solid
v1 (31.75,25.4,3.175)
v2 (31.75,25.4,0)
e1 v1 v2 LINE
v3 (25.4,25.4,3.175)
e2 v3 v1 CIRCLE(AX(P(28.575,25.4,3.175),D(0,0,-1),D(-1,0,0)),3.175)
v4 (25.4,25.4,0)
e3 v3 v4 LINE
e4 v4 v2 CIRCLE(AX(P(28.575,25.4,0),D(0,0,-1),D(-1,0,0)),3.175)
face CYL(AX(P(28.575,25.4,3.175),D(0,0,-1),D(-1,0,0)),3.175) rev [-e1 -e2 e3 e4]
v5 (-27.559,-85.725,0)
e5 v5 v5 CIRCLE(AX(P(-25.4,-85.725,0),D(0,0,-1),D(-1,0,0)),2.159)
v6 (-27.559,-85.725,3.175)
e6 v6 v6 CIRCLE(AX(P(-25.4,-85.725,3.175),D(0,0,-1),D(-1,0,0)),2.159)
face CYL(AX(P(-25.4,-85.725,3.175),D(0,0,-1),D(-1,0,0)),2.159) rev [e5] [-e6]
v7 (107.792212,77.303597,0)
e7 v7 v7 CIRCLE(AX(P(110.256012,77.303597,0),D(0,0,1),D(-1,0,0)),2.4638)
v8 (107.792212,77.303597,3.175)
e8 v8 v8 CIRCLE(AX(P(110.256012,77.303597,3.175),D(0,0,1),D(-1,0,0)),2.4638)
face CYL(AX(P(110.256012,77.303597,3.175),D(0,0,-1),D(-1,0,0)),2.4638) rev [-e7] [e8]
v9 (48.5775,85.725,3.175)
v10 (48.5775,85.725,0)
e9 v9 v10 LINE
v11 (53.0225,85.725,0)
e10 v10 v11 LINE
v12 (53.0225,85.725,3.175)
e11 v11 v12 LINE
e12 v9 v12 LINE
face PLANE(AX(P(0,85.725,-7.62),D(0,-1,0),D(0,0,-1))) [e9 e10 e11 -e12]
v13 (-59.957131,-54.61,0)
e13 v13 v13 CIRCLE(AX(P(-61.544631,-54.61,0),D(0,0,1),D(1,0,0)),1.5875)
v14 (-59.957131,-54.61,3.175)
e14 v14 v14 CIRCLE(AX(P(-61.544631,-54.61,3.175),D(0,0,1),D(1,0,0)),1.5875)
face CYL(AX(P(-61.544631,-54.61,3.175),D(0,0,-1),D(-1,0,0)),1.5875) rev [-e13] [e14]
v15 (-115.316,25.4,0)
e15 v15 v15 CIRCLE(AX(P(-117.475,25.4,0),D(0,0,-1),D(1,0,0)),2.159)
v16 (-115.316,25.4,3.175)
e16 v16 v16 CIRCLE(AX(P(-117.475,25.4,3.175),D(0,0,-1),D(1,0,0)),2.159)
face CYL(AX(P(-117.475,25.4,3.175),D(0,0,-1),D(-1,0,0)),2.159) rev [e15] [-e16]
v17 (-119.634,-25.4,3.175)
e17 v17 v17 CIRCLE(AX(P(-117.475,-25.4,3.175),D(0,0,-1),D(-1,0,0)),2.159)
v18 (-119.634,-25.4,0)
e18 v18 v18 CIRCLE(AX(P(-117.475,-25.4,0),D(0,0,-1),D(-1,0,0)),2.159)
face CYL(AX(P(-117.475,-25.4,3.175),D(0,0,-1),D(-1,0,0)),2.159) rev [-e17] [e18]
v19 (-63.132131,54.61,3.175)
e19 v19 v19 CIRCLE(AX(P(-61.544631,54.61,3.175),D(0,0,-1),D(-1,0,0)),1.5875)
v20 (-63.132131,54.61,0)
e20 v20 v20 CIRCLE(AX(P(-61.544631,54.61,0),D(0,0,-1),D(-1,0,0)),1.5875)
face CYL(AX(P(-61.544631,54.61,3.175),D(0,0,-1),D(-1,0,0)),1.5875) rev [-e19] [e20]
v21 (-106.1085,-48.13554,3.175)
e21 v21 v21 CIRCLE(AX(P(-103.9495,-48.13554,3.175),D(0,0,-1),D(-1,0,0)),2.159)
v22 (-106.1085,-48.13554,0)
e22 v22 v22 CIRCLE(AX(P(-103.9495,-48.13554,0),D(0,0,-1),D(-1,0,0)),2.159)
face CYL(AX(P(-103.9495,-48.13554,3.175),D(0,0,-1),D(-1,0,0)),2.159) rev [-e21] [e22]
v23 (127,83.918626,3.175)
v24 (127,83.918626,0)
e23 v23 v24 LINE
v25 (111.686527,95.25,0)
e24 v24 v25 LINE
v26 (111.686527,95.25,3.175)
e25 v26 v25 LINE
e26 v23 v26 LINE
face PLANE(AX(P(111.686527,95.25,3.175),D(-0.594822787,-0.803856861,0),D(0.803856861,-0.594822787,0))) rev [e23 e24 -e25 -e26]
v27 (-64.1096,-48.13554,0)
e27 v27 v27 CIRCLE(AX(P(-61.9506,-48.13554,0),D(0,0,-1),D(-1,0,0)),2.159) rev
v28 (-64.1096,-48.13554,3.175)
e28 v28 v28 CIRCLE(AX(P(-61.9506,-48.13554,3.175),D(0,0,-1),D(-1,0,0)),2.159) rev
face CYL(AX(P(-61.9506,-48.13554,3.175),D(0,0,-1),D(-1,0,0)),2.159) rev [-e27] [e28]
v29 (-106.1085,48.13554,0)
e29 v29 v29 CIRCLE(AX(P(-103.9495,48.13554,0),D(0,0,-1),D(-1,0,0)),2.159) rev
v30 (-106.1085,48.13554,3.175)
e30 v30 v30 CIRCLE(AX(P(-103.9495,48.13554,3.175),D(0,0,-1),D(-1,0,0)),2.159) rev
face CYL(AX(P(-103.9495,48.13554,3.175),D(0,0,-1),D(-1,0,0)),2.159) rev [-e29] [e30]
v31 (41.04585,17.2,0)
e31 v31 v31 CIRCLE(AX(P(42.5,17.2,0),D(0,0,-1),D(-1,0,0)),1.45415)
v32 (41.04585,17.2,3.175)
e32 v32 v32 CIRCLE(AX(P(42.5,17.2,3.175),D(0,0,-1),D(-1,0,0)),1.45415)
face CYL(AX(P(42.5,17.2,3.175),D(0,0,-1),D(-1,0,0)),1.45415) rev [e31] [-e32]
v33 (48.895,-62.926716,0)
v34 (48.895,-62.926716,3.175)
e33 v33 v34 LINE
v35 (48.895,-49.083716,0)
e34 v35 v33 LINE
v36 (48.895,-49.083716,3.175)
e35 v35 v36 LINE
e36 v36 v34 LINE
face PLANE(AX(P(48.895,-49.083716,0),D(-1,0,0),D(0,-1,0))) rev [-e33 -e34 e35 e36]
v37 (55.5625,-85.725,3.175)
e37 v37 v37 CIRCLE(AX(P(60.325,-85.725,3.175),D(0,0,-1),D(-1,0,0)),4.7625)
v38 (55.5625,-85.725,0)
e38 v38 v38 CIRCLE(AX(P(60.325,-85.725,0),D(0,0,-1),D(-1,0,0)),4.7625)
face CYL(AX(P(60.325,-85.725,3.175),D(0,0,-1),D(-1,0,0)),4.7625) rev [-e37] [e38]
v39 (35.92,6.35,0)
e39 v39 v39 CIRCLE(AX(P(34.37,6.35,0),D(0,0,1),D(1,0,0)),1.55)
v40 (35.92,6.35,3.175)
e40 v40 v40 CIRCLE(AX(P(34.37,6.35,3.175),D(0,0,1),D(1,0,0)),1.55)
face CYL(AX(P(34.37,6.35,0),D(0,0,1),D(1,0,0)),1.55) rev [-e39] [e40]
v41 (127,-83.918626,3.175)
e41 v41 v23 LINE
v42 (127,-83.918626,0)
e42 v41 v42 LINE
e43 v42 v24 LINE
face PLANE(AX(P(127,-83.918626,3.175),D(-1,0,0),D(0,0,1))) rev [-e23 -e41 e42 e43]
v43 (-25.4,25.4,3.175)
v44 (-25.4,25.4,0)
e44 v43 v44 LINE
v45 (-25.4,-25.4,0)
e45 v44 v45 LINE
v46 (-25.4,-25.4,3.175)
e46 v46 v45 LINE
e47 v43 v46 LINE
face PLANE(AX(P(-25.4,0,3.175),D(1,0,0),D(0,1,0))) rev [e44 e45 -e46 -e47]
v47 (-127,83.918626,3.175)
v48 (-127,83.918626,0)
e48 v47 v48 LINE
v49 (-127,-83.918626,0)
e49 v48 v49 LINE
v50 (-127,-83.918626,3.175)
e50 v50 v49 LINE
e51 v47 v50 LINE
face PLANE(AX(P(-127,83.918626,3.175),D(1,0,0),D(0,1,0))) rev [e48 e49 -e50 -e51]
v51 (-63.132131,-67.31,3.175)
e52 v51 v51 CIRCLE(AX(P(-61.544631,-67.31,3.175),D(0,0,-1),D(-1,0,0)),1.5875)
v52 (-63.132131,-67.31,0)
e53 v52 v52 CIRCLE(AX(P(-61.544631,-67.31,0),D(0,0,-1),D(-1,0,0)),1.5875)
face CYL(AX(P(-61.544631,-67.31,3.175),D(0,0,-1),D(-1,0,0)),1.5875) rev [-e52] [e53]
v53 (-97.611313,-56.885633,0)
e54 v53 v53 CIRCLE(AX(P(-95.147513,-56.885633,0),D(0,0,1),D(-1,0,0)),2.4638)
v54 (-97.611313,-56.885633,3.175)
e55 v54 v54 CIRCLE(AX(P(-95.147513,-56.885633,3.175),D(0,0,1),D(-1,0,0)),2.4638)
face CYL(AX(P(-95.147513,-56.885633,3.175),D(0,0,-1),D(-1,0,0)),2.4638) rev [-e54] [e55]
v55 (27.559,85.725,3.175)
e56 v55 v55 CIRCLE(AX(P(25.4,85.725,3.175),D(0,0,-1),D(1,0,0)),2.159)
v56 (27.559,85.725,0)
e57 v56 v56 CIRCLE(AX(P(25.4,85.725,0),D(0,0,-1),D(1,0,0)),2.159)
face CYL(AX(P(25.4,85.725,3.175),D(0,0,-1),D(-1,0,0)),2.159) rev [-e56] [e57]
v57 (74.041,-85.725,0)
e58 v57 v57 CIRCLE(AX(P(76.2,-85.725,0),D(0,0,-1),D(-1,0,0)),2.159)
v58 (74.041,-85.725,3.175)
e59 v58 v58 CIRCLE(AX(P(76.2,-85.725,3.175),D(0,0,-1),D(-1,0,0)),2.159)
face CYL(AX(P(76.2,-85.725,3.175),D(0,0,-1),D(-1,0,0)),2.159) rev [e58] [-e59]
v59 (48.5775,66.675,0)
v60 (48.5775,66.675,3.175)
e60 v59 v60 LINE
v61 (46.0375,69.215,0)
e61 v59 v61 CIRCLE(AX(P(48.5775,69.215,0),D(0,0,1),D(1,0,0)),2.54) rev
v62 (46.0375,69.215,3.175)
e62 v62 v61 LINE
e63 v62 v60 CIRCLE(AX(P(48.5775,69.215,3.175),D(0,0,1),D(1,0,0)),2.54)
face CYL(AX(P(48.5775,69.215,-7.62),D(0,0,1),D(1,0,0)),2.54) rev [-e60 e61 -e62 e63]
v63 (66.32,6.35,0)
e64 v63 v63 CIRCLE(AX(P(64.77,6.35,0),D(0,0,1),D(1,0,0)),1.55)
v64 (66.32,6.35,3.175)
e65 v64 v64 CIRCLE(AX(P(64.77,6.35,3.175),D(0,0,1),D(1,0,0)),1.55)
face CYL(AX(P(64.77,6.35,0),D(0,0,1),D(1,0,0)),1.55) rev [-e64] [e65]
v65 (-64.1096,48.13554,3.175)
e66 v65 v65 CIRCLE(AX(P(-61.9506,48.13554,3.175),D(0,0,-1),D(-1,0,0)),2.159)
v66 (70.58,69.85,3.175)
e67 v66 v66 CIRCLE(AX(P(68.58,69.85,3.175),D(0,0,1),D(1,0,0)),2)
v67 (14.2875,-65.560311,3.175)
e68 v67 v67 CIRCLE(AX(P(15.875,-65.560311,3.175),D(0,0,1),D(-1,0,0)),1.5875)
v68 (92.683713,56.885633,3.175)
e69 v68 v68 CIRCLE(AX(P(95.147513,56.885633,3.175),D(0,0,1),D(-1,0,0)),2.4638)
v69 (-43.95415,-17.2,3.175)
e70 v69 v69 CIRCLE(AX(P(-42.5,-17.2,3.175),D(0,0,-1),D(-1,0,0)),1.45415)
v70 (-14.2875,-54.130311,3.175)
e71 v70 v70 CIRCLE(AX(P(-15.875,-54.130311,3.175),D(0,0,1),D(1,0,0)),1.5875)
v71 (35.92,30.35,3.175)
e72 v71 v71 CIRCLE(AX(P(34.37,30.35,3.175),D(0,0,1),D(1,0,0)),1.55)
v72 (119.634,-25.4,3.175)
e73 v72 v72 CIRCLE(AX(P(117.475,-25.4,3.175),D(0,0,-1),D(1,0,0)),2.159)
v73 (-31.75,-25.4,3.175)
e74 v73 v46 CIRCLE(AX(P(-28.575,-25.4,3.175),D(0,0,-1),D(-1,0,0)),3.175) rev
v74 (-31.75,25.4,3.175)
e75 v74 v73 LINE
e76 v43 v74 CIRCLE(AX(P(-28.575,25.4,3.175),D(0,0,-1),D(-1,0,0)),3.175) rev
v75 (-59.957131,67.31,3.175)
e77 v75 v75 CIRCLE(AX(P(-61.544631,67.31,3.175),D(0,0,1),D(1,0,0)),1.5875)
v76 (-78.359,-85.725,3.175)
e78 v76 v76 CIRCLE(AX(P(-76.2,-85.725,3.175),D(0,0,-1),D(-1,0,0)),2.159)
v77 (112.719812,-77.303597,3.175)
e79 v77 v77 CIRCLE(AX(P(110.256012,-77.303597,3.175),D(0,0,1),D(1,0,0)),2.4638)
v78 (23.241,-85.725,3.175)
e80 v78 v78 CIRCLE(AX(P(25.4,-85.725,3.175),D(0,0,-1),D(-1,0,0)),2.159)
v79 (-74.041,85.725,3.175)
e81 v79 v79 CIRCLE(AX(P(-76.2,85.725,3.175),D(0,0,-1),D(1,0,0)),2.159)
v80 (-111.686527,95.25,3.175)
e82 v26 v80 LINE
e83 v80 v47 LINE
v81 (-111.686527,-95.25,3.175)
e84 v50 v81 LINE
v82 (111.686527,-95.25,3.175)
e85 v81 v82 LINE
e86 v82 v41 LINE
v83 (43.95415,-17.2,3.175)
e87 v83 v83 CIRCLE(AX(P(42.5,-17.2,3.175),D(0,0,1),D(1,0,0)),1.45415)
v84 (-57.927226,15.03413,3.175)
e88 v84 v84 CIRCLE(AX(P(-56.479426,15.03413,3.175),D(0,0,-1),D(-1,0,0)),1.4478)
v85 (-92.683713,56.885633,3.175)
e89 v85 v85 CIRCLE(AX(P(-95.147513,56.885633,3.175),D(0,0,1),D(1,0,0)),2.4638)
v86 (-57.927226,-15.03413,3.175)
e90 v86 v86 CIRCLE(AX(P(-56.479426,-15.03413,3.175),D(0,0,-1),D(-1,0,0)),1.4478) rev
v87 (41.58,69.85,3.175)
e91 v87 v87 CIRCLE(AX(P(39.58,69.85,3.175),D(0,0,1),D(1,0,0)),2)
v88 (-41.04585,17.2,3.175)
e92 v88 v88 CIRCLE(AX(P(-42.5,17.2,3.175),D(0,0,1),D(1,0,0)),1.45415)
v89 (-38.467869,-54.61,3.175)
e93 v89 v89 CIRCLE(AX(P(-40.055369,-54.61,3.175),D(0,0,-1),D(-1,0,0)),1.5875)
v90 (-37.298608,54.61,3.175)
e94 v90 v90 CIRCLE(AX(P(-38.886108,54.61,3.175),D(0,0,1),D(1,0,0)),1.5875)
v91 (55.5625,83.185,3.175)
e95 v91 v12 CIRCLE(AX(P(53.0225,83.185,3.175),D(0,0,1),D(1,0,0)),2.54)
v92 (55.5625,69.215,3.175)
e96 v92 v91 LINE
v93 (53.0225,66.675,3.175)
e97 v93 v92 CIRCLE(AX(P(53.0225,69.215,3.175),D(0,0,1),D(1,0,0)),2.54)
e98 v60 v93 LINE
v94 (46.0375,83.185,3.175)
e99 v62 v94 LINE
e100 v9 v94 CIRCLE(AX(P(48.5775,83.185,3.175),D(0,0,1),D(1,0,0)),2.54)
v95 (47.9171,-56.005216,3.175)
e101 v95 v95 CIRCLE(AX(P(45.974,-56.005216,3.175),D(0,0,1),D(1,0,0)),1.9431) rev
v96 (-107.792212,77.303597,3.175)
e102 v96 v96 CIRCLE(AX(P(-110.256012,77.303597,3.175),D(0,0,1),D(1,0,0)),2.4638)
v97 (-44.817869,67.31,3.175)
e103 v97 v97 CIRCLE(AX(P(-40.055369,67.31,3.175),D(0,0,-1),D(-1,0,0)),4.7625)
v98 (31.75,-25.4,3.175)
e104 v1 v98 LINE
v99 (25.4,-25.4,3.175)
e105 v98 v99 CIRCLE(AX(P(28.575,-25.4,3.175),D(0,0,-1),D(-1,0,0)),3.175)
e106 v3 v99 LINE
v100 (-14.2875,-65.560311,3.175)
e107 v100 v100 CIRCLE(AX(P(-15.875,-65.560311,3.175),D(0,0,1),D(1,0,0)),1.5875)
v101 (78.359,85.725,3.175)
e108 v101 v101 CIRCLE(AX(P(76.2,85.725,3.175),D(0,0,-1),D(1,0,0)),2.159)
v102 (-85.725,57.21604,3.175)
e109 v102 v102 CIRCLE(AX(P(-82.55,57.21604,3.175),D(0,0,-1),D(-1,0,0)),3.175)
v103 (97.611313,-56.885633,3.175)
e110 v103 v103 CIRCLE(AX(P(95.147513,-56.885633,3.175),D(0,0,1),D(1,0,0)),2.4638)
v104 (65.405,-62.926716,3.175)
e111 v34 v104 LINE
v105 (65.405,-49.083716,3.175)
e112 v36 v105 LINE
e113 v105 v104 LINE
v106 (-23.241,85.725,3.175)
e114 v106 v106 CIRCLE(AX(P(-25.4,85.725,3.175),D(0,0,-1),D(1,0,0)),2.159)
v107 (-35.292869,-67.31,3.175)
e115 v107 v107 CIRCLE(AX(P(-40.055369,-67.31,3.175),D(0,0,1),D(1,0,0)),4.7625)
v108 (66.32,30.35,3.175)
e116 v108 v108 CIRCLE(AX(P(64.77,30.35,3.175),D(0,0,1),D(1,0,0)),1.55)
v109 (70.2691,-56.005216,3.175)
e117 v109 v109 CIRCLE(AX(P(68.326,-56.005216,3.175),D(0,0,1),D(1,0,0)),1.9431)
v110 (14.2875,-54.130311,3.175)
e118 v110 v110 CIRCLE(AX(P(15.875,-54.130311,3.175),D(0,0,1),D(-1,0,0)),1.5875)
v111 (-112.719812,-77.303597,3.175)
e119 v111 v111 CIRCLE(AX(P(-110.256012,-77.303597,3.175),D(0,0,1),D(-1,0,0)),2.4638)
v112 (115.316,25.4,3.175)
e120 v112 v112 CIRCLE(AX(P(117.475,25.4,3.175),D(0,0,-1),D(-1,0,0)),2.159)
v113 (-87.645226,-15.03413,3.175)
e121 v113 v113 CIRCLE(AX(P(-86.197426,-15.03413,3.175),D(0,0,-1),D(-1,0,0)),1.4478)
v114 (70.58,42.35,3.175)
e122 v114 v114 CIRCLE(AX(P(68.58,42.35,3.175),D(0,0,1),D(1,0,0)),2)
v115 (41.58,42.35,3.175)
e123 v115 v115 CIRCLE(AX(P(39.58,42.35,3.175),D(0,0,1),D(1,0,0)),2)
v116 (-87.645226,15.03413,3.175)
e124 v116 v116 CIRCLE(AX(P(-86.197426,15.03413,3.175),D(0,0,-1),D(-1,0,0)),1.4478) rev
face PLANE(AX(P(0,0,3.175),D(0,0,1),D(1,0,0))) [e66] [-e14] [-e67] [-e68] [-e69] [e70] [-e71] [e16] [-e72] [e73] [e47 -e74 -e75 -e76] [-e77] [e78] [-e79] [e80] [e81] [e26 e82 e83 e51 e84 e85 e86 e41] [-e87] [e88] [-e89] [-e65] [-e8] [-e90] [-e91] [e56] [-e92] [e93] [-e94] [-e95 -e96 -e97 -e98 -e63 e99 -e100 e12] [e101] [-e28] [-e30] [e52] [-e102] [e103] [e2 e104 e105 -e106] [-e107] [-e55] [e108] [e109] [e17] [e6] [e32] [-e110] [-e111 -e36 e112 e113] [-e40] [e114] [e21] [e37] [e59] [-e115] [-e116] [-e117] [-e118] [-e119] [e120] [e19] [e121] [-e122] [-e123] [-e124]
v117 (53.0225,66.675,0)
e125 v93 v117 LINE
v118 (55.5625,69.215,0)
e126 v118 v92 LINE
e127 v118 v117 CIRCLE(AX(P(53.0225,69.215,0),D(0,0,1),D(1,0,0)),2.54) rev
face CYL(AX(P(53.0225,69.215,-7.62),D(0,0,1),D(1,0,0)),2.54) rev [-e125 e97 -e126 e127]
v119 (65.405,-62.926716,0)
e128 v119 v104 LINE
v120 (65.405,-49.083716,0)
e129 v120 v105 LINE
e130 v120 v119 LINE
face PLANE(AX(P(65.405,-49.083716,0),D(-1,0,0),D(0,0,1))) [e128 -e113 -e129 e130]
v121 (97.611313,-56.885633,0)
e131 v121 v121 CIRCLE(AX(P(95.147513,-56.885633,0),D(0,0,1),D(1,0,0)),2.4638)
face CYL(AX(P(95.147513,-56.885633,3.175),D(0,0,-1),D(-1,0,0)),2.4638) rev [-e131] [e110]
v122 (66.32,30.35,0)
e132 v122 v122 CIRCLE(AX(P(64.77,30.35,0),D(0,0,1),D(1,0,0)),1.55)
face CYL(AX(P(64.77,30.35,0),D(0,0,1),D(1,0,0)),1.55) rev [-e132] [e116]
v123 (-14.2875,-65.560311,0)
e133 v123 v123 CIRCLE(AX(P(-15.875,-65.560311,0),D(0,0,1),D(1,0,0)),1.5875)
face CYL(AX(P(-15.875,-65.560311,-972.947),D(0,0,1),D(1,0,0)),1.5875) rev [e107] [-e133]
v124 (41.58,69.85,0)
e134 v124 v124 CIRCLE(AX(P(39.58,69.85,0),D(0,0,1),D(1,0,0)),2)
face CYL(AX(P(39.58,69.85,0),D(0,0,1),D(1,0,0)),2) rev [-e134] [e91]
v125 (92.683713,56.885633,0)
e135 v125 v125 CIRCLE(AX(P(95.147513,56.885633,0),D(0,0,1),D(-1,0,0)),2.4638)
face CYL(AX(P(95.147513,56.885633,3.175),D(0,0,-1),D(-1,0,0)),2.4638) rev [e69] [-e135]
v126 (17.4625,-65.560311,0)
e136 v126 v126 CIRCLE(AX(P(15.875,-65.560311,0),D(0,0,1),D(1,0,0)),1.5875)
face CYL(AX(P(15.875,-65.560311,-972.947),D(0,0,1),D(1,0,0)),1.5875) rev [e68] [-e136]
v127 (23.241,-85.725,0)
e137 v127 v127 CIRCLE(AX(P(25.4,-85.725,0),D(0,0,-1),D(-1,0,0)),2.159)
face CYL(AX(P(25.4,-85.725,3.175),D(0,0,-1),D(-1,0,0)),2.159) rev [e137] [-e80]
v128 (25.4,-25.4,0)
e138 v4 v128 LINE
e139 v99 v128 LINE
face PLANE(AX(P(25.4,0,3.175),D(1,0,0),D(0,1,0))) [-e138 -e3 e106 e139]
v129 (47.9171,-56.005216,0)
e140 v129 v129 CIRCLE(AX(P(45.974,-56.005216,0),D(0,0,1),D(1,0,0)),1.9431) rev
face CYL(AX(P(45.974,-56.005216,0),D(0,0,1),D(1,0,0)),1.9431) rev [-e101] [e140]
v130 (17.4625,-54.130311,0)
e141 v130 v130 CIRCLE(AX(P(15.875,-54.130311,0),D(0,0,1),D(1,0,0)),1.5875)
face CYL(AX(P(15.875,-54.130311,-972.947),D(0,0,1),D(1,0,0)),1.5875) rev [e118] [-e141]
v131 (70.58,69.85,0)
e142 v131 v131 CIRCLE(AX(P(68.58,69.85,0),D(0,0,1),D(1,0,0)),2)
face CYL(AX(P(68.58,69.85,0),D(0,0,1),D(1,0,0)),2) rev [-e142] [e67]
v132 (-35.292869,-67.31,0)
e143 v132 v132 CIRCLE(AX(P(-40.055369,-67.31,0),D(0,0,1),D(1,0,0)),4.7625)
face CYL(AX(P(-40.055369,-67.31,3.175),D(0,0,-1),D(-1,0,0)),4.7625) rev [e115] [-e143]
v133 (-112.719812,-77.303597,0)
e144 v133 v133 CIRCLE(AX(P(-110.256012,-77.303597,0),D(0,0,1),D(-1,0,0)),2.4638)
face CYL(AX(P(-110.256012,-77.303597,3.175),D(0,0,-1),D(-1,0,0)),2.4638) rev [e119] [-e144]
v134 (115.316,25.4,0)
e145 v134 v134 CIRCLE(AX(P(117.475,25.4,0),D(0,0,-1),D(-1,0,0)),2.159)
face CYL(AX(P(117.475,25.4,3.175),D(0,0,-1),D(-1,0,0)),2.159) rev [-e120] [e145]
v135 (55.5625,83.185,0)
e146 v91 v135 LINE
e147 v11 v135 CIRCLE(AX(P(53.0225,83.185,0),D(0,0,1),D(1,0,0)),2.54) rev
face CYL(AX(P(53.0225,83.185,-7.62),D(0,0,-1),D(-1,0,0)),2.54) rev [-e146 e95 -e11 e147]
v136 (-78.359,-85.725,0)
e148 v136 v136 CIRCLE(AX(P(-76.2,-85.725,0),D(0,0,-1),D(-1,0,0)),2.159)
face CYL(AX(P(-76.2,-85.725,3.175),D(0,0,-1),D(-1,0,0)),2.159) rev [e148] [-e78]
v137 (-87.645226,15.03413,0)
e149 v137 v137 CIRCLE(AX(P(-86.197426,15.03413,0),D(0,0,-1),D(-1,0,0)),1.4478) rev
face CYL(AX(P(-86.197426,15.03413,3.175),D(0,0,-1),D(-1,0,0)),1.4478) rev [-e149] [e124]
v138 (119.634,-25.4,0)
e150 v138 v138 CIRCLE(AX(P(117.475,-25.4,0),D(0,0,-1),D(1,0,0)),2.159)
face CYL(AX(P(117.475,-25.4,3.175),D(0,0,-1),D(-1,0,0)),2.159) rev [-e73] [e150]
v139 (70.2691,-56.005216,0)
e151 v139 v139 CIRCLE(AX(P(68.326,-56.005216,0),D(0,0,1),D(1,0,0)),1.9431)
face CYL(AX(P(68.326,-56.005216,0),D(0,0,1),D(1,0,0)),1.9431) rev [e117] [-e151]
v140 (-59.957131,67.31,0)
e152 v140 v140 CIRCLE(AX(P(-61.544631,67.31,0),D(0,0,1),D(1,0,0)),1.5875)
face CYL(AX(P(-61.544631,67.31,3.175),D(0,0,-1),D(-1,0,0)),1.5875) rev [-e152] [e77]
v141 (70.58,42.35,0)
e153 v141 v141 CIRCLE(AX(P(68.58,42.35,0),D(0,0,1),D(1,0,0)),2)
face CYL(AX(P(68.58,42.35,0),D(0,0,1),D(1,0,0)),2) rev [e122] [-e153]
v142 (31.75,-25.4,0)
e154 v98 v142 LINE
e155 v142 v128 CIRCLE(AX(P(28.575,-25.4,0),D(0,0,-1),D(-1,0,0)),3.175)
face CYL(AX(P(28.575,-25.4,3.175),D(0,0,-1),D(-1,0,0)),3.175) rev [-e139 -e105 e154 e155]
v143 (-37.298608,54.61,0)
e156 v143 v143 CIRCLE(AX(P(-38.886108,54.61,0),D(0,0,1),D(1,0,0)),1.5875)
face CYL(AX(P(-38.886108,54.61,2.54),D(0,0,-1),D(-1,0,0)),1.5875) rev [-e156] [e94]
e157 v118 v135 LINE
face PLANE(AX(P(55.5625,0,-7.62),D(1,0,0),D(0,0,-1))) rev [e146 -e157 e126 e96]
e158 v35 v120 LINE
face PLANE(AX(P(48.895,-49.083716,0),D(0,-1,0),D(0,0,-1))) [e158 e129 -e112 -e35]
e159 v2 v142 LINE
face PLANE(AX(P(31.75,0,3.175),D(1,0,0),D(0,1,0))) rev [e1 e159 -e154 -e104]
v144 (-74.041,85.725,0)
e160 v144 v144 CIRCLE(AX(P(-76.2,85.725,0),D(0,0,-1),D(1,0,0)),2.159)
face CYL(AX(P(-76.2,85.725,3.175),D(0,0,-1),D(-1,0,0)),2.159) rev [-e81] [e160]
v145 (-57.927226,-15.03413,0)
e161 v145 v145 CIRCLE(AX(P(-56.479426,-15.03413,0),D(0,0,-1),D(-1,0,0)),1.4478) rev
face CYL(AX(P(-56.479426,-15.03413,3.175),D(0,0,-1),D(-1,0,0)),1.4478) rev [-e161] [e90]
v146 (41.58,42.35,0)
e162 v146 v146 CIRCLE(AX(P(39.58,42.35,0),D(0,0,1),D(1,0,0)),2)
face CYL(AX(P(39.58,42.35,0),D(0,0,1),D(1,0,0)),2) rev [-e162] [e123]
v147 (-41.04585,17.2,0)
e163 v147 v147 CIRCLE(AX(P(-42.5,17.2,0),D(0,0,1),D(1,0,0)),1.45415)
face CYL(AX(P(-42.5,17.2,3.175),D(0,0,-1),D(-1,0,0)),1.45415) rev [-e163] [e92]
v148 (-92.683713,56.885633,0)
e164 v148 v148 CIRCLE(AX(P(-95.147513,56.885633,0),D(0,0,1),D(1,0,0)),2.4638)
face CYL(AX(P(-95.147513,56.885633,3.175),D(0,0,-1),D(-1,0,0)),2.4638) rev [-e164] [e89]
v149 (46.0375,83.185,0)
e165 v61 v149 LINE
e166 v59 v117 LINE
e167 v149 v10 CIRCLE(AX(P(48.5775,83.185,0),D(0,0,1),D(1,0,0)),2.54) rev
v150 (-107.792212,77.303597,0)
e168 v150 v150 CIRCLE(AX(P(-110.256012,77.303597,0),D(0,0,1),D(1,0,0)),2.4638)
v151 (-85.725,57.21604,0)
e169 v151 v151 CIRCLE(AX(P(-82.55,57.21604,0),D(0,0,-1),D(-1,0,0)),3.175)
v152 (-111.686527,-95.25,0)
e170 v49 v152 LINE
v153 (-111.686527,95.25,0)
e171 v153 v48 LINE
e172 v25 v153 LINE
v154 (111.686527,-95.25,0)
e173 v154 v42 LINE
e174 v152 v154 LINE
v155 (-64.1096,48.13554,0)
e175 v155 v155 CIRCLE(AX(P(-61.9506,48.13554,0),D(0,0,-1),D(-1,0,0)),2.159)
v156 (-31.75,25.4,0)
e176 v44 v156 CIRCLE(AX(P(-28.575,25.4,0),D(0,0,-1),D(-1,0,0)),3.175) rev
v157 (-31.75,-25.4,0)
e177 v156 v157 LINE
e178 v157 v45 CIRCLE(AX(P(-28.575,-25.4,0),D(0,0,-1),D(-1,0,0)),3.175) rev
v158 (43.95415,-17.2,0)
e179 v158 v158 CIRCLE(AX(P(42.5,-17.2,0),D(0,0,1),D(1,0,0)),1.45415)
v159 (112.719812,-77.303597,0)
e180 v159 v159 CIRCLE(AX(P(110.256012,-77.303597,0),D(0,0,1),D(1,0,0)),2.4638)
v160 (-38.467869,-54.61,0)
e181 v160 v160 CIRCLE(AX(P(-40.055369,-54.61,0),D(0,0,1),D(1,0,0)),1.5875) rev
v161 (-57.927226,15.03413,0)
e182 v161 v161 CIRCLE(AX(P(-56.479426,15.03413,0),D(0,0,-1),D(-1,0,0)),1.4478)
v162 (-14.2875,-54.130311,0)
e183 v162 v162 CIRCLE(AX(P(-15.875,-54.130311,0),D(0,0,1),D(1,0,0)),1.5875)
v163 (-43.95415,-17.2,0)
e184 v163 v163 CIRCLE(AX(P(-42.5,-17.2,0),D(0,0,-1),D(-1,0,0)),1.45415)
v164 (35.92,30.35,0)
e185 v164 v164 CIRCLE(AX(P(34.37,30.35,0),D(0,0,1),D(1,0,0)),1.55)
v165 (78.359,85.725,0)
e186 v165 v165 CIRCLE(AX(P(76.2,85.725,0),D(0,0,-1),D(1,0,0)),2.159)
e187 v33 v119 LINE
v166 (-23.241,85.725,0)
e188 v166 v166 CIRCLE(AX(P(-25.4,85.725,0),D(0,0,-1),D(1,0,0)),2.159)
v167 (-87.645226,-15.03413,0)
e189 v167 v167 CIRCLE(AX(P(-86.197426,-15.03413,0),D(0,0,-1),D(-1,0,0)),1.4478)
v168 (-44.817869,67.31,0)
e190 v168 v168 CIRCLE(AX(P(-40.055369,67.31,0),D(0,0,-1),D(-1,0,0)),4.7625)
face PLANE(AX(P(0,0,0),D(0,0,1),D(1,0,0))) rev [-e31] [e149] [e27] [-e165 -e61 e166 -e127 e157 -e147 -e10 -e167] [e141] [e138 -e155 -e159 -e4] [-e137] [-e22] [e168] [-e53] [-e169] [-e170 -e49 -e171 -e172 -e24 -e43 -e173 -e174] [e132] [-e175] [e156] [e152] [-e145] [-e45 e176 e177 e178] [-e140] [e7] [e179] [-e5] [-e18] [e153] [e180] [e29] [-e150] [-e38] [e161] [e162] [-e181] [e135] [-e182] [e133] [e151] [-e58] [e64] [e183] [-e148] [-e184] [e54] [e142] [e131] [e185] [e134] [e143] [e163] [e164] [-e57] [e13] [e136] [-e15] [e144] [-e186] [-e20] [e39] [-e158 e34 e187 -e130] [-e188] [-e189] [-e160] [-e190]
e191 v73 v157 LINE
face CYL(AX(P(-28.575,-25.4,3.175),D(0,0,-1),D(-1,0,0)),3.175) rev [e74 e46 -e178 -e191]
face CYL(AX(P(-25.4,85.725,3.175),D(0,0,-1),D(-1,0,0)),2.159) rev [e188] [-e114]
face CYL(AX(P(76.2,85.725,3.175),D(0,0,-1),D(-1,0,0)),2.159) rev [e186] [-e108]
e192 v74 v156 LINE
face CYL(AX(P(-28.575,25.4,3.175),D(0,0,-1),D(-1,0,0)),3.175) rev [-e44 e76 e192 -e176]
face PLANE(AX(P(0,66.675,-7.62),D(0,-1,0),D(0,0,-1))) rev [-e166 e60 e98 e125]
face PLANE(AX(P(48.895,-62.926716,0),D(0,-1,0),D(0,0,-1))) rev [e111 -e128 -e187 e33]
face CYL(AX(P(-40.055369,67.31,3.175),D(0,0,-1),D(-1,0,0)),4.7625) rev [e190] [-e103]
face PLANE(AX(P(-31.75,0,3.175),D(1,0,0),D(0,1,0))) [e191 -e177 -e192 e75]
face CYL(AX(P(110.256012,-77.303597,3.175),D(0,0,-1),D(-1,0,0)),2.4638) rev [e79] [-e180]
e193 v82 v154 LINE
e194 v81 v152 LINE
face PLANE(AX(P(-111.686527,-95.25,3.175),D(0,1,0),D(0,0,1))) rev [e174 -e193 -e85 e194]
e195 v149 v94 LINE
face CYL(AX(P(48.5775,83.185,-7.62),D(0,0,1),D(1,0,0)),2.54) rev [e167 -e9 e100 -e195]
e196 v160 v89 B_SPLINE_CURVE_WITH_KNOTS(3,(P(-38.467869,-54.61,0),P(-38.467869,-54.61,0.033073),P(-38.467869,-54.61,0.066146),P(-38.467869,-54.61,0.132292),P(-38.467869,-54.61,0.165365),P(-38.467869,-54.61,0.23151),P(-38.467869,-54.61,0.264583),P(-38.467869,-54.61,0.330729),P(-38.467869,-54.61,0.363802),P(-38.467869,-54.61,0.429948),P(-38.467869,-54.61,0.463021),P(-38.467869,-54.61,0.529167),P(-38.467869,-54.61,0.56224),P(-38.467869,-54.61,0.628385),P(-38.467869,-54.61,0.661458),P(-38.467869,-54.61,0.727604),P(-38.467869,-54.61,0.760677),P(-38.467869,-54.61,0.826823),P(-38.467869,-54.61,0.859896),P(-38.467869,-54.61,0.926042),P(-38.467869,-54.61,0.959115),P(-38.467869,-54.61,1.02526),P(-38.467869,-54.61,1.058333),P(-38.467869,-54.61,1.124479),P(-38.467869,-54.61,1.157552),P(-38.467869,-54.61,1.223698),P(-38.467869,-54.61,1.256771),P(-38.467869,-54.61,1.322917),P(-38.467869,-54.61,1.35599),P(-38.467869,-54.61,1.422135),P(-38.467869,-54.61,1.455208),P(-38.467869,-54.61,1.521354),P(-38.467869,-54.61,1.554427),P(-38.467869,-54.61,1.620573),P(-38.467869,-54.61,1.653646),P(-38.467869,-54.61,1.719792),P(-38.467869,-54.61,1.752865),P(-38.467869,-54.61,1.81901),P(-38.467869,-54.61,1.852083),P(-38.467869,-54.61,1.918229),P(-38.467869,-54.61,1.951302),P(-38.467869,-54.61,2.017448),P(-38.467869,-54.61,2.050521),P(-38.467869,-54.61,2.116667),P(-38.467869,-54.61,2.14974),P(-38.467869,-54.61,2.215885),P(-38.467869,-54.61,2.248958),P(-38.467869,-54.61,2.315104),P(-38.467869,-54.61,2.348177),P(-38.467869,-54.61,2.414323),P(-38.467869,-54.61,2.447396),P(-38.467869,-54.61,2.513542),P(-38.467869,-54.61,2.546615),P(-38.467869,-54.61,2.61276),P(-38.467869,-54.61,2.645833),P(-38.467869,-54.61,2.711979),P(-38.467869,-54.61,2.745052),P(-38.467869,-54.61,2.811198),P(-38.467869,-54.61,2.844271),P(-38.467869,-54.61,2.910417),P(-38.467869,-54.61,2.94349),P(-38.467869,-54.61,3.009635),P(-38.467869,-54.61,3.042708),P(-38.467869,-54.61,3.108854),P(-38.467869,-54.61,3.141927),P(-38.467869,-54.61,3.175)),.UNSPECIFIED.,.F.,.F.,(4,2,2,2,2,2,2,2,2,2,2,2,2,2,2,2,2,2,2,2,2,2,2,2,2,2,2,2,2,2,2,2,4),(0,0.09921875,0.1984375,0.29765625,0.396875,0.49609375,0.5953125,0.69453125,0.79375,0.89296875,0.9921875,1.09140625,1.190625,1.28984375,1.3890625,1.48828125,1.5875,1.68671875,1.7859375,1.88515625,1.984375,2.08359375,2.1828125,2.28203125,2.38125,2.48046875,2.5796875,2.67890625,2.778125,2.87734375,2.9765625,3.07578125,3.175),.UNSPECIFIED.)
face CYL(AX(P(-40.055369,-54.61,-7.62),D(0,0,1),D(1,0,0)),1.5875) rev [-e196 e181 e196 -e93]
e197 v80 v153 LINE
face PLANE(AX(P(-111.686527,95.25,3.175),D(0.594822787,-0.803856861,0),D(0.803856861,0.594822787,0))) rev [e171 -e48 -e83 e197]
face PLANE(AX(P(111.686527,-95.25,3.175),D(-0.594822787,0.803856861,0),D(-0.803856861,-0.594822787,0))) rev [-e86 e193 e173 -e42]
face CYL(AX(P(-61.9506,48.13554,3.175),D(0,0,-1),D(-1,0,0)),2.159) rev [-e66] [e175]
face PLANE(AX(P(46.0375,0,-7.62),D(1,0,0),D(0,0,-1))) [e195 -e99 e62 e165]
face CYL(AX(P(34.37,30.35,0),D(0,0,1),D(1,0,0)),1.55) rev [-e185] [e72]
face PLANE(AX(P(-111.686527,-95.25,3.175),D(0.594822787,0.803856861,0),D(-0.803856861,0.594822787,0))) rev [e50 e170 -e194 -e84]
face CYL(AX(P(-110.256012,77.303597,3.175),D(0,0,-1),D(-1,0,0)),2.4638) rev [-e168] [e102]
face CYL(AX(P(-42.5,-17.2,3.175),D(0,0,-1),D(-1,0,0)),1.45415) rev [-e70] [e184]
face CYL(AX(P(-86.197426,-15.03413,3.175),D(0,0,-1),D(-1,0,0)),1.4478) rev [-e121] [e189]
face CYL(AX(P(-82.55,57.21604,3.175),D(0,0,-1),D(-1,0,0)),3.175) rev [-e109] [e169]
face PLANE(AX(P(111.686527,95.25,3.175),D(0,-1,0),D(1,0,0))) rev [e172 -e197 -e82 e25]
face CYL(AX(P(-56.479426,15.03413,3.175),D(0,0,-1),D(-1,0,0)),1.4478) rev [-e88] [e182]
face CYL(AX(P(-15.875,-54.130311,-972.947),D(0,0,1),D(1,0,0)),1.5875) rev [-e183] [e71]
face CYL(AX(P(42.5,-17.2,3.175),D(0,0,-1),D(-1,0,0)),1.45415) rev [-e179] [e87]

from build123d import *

# Parameters (mm, degrees)
SKETCH1_R                = 2.4638
BOSS_EXTRUDE1_DEPTH      = 3.175
SKETCH2_W                = 16.51
SKETCH2_H                = 13.843
SKETCH2_R                = 1.9431
CUT_EXTRUDE1_DEPTH       = 159.781746826
SKETCH5_R                = 3.175
SKETCH5_R_2              = 2.159
SKETCH5_R_3              = 1.4478
CUT_EXTRUDE2_DEPTH       = 159.781746826
SKETCH6_R                = 2.159
CUT_EXTRUDE3_DEPTH       = 159.781746826
SKETCH5_3_R              = 1.45415
CUT_EXTRUDE4_DEPTH       = 159.781746826
SKETCH5_4_R              = 1.5875
SKETCH5_4_R_2            = 4.7625
CUT_EXTRUDE5_DEPTH       = 159.781746826
SKETCH5_5_R              = 1.5875
CUT_EXTRUDE6_DEPTH       = 2.54
SKETCH5_6_R              = 1.5875
CUT_EXTRUDE7_DEPTH       = 159.781746826
CUT_EXTRUDE8_DEPTH       = 7.62
CUT_EXTRUDE8_DEPTH_BACK  = 2.54
SKETCH5_7_W              = 9.525
SKETCH5_7_H              = 19.05
SKETCH5_7_R              = 1.5875
SKETCH5_9_R              = 1.5875
CUT_EXTRUDE9_DEPTH       = 159.781746826
CUT_EXTRUDE17_DEPTH      = 159.781746826
CUT_EXTRUDE17_DEPTH_BACK = 159.781746826
SKETCH5_15_W             = 9.525
SKETCH5_15_H             = 19.05
FILLET1_R                = 2.54
FILLET2_R                = 2.54
FILLET3_R                = 2.54
FILLET4_R                = 2.54
SKETCH9_R                = 1.55
SKETCH9_R_2              = 2
CUT_EXTRUDE18_DEPTH      = 159.781746826
SKETCH3_R                = 1.5875
CUT_EXTRUDE19_DEPTH      = 976.122


with BuildPart() as part:
    # Sketch1 → Boss-Extrude1 (new body)
    with BuildSketch(Plane.XY):
        Polygon((-111.686526805, -95.25), (-127, -83.918625912), (-127, 83.918625912), (-111.686526805, 95.25), (111.686526805, 95.25), (127, 83.918625912), (127, -83.918625912), (111.686526805, -95.25), align=None)
        with Locations((-95.147512794, 56.885632681)):
            Circle(SKETCH1_R, mode=Mode.SUBTRACT)
        with Locations((-110.256011578, 77.303596941)):
            Circle(SKETCH1_R, mode=Mode.SUBTRACT)
        with Locations((110.256011578, 77.303596941)):
            Circle(SKETCH1_R, mode=Mode.SUBTRACT)
        with Locations((95.147512794, 56.885632681)):
            Circle(SKETCH1_R, mode=Mode.SUBTRACT)
        with Locations((-110.256011578, -77.303596941)):
            Circle(SKETCH1_R, mode=Mode.SUBTRACT)
        with Locations((-95.147512794, -56.885632681)):
            Circle(SKETCH1_R, mode=Mode.SUBTRACT)
        with Locations((110.256011578, -77.303596941)):
            Circle(SKETCH1_R, mode=Mode.SUBTRACT)
        with Locations((95.147512794, -56.885632681)):
            Circle(SKETCH1_R, mode=Mode.SUBTRACT)
    extrude(amount=BOSS_EXTRUDE1_DEPTH)

    # Sketch2 → Cut-Extrude1 (cut, through all)
    with BuildSketch(Plane.XY.offset(3.175)):
        with Locations((57.15, -56.00521613)):
            Rectangle(SKETCH2_W, SKETCH2_H)
        with Locations((68.326, -56.00521613)):
            Circle(SKETCH2_R)
        with Locations((45.974, -56.00521613)):
            Circle(SKETCH2_R)
    extrude(amount=-CUT_EXTRUDE1_DEPTH, mode=Mode.SUBTRACT)

    # Sketch5 → Cut-Extrude2 (cut, through all)
    with BuildSketch(Plane(origin=(0, 0, 0), x_dir=(-1, 0, 0), z_dir=(0, 0, -1))):
        with Locations((82.55, 57.21604)):
            Circle(SKETCH5_R)
        with Locations((61.9506, -48.13554)):
            Circle(SKETCH5_R_2)
        with Locations((103.9495, -48.13554)):
            Circle(SKETCH5_R_2)
        with Locations((103.9495, 48.13554)):
            Circle(SKETCH5_R_2)
        with Locations((61.9506, 48.13554)):
            Circle(SKETCH5_R_2)
        with BuildLine():
            Line((-31.75, 25.4), (-31.75, -25.4))
            ThreePointArc((-31.75, -25.4), (-28.575, -28.575), (-25.4, -25.4))
            Line((-25.4, -25.4), (-25.4, 25.4))
            ThreePointArc((-25.4, 25.4), (-28.575, 28.575), (-31.75, 25.4))
        make_face()
        with Locations((86.197426463, 15.03413)):
            Circle(SKETCH5_R_3)
        with Locations((56.479426463, 15.03413)):
            Circle(SKETCH5_R_3)
        with Locations((56.479426463, -15.03413)):
            Circle(SKETCH5_R_3)
        with Locations((86.197426463, -15.03413)):
            Circle(SKETCH5_R_3)
        with BuildLine():
            ThreePointArc((31.75, 25.4), (28.575, 28.575), (25.4, 25.4))
            Line((25.4, 25.4), (25.4, -25.4))
            ThreePointArc((25.4, -25.4), (28.575, -28.575), (31.75, -25.4))
            Line((31.75, -25.4), (31.75, 25.4))
        make_face()
    extrude(amount=-CUT_EXTRUDE2_DEPTH, mode=Mode.SUBTRACT)

    # Sketch6 → Cut-Extrude3 (cut, through all)
    with BuildSketch(Plane(origin=(0, 0, 0), x_dir=(-1, 0, 0), z_dir=(0, 0, -1))):
        with Locations((-76.2, -85.725)):
            Circle(SKETCH6_R)
        with Locations((-25.4, -85.725)):
            Circle(SKETCH6_R)
        with Locations((25.4, -85.725)):
            Circle(SKETCH6_R)
        with Locations((76.2, -85.725)):
            Circle(SKETCH6_R)
        with Locations((76.2, 85.725)):
            Circle(SKETCH6_R)
        with Locations((25.4, 85.725)):
            Circle(SKETCH6_R)
        with Locations((-25.4, 85.725)):
            Circle(SKETCH6_R)
        with Locations((-76.2, 85.725)):
            Circle(SKETCH6_R)
        with Locations((117.475, -25.4)):
            Circle(SKETCH6_R)
        with Locations((117.475, 25.4)):
            Circle(SKETCH6_R)
        with Locations((-117.475, 25.4)):
            Circle(SKETCH6_R)
        with Locations((-117.475, -25.4)):
            Circle(SKETCH6_R)
    extrude(amount=-CUT_EXTRUDE3_DEPTH, mode=Mode.SUBTRACT)

    # Sketch5<3> → Cut-Extrude4 (cut, through all)
    with BuildSketch(Plane(origin=(0, 0, 0), x_dir=(-1, 0, 0), z_dir=(0, 0, -1))):
        with Locations((-42.5, 17.2)):
            Circle(SKETCH5_3_R)
        with Locations((-42.5, -17.2)):
            Circle(SKETCH5_3_R)
        with Locations((42.5, -17.2)):
            Circle(SKETCH5_3_R)
        with Locations((42.5, 17.2)):
            Circle(SKETCH5_3_R)
    extrude(amount=-CUT_EXTRUDE4_DEPTH, mode=Mode.SUBTRACT)

    # Sketch5<4> → Cut-Extrude5 (cut, through all)
    with BuildSketch(Plane(origin=(0, 0, 0), x_dir=(-1, 0, 0), z_dir=(0, 0, -1))):
        with Locations((61.544630637, -54.61)):
            Circle(SKETCH5_4_R)
        with Locations((61.544630637, -67.31)):
            Circle(SKETCH5_4_R)
        with Locations((-60.325, -85.725)):
            Circle(SKETCH5_4_R_2)
        with Locations((61.544630637, 54.61)):
            Circle(SKETCH5_4_R)
        with Locations((40.055369363, -67.31)):
            Circle(SKETCH5_4_R_2)
        with Locations((61.544630637, 67.31)):
            Circle(SKETCH5_4_R)
        with Locations((40.055369363, 67.31)):
            Circle(SKETCH5_4_R_2)
    extrude(amount=-CUT_EXTRUDE5_DEPTH, mode=Mode.SUBTRACT)

    # Sketch5<5> → Cut-Extrude6 (cut)
    with BuildSketch(Plane(origin=(0, 0, 0), x_dir=(-1, 0, 0), z_dir=(0, 0, -1))):
        with Locations((38.886108088, 54.61)):
            Circle(SKETCH5_5_R)
    extrude(amount=-CUT_EXTRUDE6_DEPTH, mode=Mode.SUBTRACT)

    # Sketch5<6> → Cut-Extrude7 (cut, through all)
    with BuildSketch(Plane(origin=(0, 0, 0), x_dir=(-1, 0, 0), z_dir=(0, 0, -1))):
        with Locations((38.886108088, 54.61)):
            Circle(SKETCH5_6_R)
    extrude(amount=-CUT_EXTRUDE7_DEPTH, mode=Mode.SUBTRACT)

    # Sketch5<7> → Cut-Extrude8 (cut, two sides: drawn at the far end of the back side and taken through both)
    with BuildSketch(Plane(origin=(0, 0, 0), x_dir=(-1, 0, 0), z_dir=(0, 0, -1)).offset(-CUT_EXTRUDE8_DEPTH_BACK)):
        with Locations((-50.8, 76.2)):
            Rectangle(SKETCH5_7_W, SKETCH5_7_H)
        with Locations((40.055369363, -54.61)):
            Circle(SKETCH5_7_R)
    extrude(amount=CUT_EXTRUDE8_DEPTH + CUT_EXTRUDE8_DEPTH_BACK, mode=Mode.SUBTRACT)

    # Sketch5<9> → Cut-Extrude9 (cut, through all)
    with BuildSketch(Plane(origin=(0, 0, 0), x_dir=(-1, 0, 0), z_dir=(0, 0, -1))):
        with Locations((40.055369363, -54.61)):
            Circle(SKETCH5_9_R)
    extrude(amount=-CUT_EXTRUDE9_DEPTH, mode=Mode.SUBTRACT)

    # Sketch5<15> → Cut-Extrude17 (cut, two sides: drawn at the far end of the back side and taken through both)
    with BuildSketch(Plane(origin=(0, 0, 0), x_dir=(-1, 0, 0), z_dir=(0, 0, -1)).offset(-CUT_EXTRUDE17_DEPTH_BACK)):
        with Locations((-50.8, 76.2)):
            Rectangle(SKETCH5_15_W, SKETCH5_15_H)
    extrude(amount=CUT_EXTRUDE17_DEPTH + CUT_EXTRUDE17_DEPTH_BACK, mode=Mode.SUBTRACT)

    # Fillet1
    fillet1_edges = [part.edges().sort_by_distance(p)[0] for p in [
        (55.5625, 85.725, 1.5875),
    ]]
    fillet(fillet1_edges, radius=FILLET1_R)

    # Fillet2
    fillet2_edges = [part.edges().sort_by_distance(p)[0] for p in [
        (46.0375, 85.725, 1.5875),
    ]]
    fillet(fillet2_edges, radius=FILLET2_R)

    # Fillet3
    fillet3_edges = [part.edges().sort_by_distance(p)[0] for p in [
        (46.0375, 66.675, 1.5875),
    ]]
    fillet(fillet3_edges, radius=FILLET3_R)

    # Fillet4
    fillet4_edges = [part.edges().sort_by_distance(p)[0] for p in [
        (55.5625, 66.675, 1.5875),
    ]]
    fillet(fillet4_edges, radius=FILLET4_R)

    # Sketch9 → Cut-Extrude18 (cut, through all)
    with BuildSketch(Plane.XY.offset(3.175)):
        with Locations((34.370000094, 30.350000006)):
            Circle(SKETCH9_R)
        with Locations((64.77, 30.350000006)):
            Circle(SKETCH9_R)
        with Locations((64.77, 6.35)):
            Circle(SKETCH9_R)
        with Locations((34.370000094, 6.35)):
            Circle(SKETCH9_R)
        with Locations((68.58, 69.85)):
            Circle(SKETCH9_R_2)
        with Locations((39.58, 69.85)):
            Circle(SKETCH9_R_2)
        with Locations((39.58, 42.35)):
            Circle(SKETCH9_R_2)
        with Locations((68.58, 42.35)):
            Circle(SKETCH9_R_2)
    extrude(amount=-CUT_EXTRUDE18_DEPTH, mode=Mode.SUBTRACT)

    # Sketch3 → Cut-Extrude19 (cut)
    with BuildSketch(Plane.XY.offset(3.175)):
        with Locations((-15.875, -65.560310834)):
            Circle(SKETCH3_R)
        with Locations((15.875, -65.560310834)):
            Circle(SKETCH3_R)
        with Locations((-15.875, -54.130310834)):
            Circle(SKETCH3_R)
        with Locations((15.875, -54.130310834)):
            Circle(SKETCH3_R)
    extrude(amount=-CUT_EXTRUDE19_DEPTH, mode=Mode.SUBTRACT)


solid = part.part
